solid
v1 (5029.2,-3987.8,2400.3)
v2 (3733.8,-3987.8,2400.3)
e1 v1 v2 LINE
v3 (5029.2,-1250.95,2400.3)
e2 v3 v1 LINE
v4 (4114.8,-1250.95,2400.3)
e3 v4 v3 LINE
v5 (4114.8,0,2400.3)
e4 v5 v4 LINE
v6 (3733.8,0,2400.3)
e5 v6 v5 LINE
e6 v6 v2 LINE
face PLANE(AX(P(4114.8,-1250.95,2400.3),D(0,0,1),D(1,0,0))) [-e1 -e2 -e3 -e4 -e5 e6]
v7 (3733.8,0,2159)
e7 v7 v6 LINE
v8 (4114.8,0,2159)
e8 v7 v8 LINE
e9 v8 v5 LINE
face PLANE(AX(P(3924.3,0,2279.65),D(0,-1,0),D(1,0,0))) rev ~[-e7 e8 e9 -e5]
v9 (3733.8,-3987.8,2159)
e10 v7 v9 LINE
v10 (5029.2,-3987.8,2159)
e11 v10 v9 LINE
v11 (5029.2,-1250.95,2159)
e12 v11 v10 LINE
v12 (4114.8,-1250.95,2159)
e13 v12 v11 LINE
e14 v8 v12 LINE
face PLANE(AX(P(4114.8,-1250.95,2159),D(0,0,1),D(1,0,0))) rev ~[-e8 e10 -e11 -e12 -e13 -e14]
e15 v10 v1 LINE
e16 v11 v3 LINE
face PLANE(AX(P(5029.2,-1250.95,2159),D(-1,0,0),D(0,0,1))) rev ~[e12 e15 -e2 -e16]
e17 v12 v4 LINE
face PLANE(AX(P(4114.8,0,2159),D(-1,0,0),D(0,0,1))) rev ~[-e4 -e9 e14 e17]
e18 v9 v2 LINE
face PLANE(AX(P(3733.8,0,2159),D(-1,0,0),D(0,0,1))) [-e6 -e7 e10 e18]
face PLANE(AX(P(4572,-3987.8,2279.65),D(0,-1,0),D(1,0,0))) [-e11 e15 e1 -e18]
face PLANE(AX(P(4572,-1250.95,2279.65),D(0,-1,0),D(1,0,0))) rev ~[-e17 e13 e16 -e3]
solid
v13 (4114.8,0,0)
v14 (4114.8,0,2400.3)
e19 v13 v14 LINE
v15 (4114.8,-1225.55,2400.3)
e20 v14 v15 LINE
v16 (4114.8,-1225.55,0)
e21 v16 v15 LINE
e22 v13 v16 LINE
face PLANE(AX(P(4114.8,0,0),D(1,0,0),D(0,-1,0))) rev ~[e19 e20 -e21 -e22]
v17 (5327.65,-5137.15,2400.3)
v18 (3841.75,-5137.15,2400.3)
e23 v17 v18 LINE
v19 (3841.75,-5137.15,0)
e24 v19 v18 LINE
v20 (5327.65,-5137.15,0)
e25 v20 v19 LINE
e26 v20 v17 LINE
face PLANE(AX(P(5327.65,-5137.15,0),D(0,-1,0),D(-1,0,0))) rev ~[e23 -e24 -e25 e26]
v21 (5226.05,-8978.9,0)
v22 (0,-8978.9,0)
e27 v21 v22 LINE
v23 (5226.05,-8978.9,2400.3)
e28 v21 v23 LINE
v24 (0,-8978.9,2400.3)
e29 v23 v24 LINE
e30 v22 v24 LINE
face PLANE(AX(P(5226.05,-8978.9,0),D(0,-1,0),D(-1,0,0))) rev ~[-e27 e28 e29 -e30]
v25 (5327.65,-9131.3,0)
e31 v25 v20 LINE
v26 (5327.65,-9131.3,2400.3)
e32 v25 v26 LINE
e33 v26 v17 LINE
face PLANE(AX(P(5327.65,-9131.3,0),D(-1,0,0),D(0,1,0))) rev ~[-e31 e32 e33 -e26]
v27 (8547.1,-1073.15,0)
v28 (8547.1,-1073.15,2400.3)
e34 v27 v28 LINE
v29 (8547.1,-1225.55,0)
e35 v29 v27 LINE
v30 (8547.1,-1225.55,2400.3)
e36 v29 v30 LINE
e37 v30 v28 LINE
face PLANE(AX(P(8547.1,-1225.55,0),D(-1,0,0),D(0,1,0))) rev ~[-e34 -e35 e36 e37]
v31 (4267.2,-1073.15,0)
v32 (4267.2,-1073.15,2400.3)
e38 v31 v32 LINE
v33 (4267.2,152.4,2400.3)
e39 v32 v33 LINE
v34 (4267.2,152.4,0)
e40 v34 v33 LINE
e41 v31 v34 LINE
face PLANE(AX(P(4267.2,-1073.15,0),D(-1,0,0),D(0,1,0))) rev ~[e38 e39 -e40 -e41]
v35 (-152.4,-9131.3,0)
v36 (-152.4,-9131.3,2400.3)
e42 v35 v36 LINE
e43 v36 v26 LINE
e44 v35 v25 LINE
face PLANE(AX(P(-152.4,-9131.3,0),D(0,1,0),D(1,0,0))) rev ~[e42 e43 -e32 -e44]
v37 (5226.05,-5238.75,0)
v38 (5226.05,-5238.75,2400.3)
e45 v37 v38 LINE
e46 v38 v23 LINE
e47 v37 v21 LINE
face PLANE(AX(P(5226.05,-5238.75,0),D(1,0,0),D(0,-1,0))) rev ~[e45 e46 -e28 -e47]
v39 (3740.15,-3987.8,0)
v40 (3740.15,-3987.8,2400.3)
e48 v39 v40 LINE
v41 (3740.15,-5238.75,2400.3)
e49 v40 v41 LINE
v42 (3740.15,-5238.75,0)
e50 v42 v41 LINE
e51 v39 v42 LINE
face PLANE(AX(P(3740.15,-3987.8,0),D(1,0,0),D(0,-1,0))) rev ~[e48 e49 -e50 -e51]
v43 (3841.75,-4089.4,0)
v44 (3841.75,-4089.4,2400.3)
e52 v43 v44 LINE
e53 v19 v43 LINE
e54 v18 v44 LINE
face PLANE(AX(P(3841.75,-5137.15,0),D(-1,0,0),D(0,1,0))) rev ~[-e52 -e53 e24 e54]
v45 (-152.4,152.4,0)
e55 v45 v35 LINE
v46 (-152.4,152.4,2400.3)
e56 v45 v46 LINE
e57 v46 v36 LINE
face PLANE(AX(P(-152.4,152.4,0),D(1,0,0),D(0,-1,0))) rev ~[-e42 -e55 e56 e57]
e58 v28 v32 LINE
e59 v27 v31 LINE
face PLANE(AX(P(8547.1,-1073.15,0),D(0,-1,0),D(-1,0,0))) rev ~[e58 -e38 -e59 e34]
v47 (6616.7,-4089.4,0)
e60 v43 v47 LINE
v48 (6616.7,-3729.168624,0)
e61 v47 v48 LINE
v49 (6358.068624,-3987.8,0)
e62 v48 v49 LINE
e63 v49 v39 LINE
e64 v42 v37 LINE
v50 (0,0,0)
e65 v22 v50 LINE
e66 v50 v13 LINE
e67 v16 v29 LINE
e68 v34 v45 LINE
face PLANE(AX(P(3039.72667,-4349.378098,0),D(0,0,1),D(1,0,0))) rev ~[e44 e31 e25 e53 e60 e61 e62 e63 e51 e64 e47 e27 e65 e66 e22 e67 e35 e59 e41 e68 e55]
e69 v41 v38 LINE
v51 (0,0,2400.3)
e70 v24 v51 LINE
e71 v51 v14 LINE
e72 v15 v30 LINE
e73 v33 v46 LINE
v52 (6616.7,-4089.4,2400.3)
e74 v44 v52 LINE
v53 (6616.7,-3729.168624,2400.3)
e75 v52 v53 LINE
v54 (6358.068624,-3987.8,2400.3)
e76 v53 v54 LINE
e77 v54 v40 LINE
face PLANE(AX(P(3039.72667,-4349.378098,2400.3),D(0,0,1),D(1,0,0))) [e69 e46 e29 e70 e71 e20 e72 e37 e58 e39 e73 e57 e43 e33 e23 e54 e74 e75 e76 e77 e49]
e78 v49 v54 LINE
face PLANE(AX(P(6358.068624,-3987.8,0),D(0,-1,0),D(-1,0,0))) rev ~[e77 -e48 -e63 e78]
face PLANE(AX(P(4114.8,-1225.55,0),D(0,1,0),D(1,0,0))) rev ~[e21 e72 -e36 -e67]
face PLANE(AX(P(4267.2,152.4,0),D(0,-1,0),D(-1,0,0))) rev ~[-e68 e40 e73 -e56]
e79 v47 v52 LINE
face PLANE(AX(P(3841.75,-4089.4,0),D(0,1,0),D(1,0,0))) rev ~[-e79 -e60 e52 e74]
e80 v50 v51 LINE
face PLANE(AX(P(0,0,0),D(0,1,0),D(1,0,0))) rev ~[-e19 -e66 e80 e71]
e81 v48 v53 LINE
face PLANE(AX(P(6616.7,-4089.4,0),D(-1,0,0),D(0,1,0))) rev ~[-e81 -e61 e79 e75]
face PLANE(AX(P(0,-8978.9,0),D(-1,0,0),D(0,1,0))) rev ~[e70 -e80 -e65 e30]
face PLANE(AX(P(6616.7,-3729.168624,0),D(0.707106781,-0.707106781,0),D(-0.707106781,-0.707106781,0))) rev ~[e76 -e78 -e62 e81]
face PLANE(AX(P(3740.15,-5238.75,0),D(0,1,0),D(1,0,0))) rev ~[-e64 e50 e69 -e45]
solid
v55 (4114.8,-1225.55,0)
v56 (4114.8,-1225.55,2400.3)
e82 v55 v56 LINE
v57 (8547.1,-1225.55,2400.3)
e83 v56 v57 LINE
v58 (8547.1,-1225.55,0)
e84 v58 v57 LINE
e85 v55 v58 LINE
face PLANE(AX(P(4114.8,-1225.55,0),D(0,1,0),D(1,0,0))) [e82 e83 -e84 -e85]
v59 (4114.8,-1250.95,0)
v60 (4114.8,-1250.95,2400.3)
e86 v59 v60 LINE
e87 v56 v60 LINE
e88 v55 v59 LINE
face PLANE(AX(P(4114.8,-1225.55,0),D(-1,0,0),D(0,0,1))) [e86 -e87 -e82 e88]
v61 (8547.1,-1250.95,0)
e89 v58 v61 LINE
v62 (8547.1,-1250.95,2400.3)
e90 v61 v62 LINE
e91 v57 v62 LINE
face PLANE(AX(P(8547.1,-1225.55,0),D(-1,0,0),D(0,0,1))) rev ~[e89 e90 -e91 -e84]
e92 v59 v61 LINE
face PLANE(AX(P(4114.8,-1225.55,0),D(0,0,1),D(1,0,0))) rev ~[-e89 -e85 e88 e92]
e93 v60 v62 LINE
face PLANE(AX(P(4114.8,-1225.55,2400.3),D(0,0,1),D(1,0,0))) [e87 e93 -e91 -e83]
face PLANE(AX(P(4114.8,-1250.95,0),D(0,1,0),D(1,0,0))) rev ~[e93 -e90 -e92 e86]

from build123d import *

# Parameters (mm, degrees)
F1_DEPTH = 2400.3
F3_W     = 381
F3_H     = 241.3
F4_DEPTH = 3987.8
F5_DEPTH = 25.4
F6_W     = 914.4
F6_H     = 241.3
F7_DEPTH = 2736.85


with BuildPart() as f1:
    # F0 (on Top) → F1 (new body)
    with BuildSketch(Plane.XY):
        Polygon((0, -8978.9), (0, 0), (4114.8, 0), (4114.8, -1225.55), (8547.1, -1225.55), (8547.1, -1073.15), (4267.2, -1073.15), (4267.2, 152.4), (-152.4, 152.4), (-152.4, -9131.3), (5327.65, -9131.3), (5327.65, -5137.15), (3841.75, -5137.15), (3841.75, -4089.4), (6616.7, -4089.4), (6616.7, -3729.1686237132), (6358.0686237132, -3987.8), (3740.15, -3987.8), (3740.15, -5238.75), (5226.05, -5238.75), (5226.05, -8978.9), align=None)
    extrude(amount=F1_DEPTH)


with BuildPart() as f4:
    # F3 (on face) → F4 (new body, through all)
    with BuildSketch(Plane.XZ):
        with Locations((3924.3, 2279.65)):
            Rectangle(F3_W, F3_H)
    extrude(amount=F4_DEPTH)

    # F6 (on face) → F7 (join, through all)
    with BuildSketch(Plane.XZ.offset(1250.95)):
        with Locations((4572, 2279.65)):
            Rectangle(F6_W, F6_H)
    extrude(amount=F7_DEPTH)


with BuildPart() as f5:
    # F5 (new): a face of the model
    f5_faces = [f1.part.faces().sort_by_distance(p)[0] for p in [
        (6330.95, -1225.55, 1200.15),
    ]]
    extrude(f5_faces, amount=F5_DEPTH)


solid = Compound([f1.part, f4.part, f5.part])
